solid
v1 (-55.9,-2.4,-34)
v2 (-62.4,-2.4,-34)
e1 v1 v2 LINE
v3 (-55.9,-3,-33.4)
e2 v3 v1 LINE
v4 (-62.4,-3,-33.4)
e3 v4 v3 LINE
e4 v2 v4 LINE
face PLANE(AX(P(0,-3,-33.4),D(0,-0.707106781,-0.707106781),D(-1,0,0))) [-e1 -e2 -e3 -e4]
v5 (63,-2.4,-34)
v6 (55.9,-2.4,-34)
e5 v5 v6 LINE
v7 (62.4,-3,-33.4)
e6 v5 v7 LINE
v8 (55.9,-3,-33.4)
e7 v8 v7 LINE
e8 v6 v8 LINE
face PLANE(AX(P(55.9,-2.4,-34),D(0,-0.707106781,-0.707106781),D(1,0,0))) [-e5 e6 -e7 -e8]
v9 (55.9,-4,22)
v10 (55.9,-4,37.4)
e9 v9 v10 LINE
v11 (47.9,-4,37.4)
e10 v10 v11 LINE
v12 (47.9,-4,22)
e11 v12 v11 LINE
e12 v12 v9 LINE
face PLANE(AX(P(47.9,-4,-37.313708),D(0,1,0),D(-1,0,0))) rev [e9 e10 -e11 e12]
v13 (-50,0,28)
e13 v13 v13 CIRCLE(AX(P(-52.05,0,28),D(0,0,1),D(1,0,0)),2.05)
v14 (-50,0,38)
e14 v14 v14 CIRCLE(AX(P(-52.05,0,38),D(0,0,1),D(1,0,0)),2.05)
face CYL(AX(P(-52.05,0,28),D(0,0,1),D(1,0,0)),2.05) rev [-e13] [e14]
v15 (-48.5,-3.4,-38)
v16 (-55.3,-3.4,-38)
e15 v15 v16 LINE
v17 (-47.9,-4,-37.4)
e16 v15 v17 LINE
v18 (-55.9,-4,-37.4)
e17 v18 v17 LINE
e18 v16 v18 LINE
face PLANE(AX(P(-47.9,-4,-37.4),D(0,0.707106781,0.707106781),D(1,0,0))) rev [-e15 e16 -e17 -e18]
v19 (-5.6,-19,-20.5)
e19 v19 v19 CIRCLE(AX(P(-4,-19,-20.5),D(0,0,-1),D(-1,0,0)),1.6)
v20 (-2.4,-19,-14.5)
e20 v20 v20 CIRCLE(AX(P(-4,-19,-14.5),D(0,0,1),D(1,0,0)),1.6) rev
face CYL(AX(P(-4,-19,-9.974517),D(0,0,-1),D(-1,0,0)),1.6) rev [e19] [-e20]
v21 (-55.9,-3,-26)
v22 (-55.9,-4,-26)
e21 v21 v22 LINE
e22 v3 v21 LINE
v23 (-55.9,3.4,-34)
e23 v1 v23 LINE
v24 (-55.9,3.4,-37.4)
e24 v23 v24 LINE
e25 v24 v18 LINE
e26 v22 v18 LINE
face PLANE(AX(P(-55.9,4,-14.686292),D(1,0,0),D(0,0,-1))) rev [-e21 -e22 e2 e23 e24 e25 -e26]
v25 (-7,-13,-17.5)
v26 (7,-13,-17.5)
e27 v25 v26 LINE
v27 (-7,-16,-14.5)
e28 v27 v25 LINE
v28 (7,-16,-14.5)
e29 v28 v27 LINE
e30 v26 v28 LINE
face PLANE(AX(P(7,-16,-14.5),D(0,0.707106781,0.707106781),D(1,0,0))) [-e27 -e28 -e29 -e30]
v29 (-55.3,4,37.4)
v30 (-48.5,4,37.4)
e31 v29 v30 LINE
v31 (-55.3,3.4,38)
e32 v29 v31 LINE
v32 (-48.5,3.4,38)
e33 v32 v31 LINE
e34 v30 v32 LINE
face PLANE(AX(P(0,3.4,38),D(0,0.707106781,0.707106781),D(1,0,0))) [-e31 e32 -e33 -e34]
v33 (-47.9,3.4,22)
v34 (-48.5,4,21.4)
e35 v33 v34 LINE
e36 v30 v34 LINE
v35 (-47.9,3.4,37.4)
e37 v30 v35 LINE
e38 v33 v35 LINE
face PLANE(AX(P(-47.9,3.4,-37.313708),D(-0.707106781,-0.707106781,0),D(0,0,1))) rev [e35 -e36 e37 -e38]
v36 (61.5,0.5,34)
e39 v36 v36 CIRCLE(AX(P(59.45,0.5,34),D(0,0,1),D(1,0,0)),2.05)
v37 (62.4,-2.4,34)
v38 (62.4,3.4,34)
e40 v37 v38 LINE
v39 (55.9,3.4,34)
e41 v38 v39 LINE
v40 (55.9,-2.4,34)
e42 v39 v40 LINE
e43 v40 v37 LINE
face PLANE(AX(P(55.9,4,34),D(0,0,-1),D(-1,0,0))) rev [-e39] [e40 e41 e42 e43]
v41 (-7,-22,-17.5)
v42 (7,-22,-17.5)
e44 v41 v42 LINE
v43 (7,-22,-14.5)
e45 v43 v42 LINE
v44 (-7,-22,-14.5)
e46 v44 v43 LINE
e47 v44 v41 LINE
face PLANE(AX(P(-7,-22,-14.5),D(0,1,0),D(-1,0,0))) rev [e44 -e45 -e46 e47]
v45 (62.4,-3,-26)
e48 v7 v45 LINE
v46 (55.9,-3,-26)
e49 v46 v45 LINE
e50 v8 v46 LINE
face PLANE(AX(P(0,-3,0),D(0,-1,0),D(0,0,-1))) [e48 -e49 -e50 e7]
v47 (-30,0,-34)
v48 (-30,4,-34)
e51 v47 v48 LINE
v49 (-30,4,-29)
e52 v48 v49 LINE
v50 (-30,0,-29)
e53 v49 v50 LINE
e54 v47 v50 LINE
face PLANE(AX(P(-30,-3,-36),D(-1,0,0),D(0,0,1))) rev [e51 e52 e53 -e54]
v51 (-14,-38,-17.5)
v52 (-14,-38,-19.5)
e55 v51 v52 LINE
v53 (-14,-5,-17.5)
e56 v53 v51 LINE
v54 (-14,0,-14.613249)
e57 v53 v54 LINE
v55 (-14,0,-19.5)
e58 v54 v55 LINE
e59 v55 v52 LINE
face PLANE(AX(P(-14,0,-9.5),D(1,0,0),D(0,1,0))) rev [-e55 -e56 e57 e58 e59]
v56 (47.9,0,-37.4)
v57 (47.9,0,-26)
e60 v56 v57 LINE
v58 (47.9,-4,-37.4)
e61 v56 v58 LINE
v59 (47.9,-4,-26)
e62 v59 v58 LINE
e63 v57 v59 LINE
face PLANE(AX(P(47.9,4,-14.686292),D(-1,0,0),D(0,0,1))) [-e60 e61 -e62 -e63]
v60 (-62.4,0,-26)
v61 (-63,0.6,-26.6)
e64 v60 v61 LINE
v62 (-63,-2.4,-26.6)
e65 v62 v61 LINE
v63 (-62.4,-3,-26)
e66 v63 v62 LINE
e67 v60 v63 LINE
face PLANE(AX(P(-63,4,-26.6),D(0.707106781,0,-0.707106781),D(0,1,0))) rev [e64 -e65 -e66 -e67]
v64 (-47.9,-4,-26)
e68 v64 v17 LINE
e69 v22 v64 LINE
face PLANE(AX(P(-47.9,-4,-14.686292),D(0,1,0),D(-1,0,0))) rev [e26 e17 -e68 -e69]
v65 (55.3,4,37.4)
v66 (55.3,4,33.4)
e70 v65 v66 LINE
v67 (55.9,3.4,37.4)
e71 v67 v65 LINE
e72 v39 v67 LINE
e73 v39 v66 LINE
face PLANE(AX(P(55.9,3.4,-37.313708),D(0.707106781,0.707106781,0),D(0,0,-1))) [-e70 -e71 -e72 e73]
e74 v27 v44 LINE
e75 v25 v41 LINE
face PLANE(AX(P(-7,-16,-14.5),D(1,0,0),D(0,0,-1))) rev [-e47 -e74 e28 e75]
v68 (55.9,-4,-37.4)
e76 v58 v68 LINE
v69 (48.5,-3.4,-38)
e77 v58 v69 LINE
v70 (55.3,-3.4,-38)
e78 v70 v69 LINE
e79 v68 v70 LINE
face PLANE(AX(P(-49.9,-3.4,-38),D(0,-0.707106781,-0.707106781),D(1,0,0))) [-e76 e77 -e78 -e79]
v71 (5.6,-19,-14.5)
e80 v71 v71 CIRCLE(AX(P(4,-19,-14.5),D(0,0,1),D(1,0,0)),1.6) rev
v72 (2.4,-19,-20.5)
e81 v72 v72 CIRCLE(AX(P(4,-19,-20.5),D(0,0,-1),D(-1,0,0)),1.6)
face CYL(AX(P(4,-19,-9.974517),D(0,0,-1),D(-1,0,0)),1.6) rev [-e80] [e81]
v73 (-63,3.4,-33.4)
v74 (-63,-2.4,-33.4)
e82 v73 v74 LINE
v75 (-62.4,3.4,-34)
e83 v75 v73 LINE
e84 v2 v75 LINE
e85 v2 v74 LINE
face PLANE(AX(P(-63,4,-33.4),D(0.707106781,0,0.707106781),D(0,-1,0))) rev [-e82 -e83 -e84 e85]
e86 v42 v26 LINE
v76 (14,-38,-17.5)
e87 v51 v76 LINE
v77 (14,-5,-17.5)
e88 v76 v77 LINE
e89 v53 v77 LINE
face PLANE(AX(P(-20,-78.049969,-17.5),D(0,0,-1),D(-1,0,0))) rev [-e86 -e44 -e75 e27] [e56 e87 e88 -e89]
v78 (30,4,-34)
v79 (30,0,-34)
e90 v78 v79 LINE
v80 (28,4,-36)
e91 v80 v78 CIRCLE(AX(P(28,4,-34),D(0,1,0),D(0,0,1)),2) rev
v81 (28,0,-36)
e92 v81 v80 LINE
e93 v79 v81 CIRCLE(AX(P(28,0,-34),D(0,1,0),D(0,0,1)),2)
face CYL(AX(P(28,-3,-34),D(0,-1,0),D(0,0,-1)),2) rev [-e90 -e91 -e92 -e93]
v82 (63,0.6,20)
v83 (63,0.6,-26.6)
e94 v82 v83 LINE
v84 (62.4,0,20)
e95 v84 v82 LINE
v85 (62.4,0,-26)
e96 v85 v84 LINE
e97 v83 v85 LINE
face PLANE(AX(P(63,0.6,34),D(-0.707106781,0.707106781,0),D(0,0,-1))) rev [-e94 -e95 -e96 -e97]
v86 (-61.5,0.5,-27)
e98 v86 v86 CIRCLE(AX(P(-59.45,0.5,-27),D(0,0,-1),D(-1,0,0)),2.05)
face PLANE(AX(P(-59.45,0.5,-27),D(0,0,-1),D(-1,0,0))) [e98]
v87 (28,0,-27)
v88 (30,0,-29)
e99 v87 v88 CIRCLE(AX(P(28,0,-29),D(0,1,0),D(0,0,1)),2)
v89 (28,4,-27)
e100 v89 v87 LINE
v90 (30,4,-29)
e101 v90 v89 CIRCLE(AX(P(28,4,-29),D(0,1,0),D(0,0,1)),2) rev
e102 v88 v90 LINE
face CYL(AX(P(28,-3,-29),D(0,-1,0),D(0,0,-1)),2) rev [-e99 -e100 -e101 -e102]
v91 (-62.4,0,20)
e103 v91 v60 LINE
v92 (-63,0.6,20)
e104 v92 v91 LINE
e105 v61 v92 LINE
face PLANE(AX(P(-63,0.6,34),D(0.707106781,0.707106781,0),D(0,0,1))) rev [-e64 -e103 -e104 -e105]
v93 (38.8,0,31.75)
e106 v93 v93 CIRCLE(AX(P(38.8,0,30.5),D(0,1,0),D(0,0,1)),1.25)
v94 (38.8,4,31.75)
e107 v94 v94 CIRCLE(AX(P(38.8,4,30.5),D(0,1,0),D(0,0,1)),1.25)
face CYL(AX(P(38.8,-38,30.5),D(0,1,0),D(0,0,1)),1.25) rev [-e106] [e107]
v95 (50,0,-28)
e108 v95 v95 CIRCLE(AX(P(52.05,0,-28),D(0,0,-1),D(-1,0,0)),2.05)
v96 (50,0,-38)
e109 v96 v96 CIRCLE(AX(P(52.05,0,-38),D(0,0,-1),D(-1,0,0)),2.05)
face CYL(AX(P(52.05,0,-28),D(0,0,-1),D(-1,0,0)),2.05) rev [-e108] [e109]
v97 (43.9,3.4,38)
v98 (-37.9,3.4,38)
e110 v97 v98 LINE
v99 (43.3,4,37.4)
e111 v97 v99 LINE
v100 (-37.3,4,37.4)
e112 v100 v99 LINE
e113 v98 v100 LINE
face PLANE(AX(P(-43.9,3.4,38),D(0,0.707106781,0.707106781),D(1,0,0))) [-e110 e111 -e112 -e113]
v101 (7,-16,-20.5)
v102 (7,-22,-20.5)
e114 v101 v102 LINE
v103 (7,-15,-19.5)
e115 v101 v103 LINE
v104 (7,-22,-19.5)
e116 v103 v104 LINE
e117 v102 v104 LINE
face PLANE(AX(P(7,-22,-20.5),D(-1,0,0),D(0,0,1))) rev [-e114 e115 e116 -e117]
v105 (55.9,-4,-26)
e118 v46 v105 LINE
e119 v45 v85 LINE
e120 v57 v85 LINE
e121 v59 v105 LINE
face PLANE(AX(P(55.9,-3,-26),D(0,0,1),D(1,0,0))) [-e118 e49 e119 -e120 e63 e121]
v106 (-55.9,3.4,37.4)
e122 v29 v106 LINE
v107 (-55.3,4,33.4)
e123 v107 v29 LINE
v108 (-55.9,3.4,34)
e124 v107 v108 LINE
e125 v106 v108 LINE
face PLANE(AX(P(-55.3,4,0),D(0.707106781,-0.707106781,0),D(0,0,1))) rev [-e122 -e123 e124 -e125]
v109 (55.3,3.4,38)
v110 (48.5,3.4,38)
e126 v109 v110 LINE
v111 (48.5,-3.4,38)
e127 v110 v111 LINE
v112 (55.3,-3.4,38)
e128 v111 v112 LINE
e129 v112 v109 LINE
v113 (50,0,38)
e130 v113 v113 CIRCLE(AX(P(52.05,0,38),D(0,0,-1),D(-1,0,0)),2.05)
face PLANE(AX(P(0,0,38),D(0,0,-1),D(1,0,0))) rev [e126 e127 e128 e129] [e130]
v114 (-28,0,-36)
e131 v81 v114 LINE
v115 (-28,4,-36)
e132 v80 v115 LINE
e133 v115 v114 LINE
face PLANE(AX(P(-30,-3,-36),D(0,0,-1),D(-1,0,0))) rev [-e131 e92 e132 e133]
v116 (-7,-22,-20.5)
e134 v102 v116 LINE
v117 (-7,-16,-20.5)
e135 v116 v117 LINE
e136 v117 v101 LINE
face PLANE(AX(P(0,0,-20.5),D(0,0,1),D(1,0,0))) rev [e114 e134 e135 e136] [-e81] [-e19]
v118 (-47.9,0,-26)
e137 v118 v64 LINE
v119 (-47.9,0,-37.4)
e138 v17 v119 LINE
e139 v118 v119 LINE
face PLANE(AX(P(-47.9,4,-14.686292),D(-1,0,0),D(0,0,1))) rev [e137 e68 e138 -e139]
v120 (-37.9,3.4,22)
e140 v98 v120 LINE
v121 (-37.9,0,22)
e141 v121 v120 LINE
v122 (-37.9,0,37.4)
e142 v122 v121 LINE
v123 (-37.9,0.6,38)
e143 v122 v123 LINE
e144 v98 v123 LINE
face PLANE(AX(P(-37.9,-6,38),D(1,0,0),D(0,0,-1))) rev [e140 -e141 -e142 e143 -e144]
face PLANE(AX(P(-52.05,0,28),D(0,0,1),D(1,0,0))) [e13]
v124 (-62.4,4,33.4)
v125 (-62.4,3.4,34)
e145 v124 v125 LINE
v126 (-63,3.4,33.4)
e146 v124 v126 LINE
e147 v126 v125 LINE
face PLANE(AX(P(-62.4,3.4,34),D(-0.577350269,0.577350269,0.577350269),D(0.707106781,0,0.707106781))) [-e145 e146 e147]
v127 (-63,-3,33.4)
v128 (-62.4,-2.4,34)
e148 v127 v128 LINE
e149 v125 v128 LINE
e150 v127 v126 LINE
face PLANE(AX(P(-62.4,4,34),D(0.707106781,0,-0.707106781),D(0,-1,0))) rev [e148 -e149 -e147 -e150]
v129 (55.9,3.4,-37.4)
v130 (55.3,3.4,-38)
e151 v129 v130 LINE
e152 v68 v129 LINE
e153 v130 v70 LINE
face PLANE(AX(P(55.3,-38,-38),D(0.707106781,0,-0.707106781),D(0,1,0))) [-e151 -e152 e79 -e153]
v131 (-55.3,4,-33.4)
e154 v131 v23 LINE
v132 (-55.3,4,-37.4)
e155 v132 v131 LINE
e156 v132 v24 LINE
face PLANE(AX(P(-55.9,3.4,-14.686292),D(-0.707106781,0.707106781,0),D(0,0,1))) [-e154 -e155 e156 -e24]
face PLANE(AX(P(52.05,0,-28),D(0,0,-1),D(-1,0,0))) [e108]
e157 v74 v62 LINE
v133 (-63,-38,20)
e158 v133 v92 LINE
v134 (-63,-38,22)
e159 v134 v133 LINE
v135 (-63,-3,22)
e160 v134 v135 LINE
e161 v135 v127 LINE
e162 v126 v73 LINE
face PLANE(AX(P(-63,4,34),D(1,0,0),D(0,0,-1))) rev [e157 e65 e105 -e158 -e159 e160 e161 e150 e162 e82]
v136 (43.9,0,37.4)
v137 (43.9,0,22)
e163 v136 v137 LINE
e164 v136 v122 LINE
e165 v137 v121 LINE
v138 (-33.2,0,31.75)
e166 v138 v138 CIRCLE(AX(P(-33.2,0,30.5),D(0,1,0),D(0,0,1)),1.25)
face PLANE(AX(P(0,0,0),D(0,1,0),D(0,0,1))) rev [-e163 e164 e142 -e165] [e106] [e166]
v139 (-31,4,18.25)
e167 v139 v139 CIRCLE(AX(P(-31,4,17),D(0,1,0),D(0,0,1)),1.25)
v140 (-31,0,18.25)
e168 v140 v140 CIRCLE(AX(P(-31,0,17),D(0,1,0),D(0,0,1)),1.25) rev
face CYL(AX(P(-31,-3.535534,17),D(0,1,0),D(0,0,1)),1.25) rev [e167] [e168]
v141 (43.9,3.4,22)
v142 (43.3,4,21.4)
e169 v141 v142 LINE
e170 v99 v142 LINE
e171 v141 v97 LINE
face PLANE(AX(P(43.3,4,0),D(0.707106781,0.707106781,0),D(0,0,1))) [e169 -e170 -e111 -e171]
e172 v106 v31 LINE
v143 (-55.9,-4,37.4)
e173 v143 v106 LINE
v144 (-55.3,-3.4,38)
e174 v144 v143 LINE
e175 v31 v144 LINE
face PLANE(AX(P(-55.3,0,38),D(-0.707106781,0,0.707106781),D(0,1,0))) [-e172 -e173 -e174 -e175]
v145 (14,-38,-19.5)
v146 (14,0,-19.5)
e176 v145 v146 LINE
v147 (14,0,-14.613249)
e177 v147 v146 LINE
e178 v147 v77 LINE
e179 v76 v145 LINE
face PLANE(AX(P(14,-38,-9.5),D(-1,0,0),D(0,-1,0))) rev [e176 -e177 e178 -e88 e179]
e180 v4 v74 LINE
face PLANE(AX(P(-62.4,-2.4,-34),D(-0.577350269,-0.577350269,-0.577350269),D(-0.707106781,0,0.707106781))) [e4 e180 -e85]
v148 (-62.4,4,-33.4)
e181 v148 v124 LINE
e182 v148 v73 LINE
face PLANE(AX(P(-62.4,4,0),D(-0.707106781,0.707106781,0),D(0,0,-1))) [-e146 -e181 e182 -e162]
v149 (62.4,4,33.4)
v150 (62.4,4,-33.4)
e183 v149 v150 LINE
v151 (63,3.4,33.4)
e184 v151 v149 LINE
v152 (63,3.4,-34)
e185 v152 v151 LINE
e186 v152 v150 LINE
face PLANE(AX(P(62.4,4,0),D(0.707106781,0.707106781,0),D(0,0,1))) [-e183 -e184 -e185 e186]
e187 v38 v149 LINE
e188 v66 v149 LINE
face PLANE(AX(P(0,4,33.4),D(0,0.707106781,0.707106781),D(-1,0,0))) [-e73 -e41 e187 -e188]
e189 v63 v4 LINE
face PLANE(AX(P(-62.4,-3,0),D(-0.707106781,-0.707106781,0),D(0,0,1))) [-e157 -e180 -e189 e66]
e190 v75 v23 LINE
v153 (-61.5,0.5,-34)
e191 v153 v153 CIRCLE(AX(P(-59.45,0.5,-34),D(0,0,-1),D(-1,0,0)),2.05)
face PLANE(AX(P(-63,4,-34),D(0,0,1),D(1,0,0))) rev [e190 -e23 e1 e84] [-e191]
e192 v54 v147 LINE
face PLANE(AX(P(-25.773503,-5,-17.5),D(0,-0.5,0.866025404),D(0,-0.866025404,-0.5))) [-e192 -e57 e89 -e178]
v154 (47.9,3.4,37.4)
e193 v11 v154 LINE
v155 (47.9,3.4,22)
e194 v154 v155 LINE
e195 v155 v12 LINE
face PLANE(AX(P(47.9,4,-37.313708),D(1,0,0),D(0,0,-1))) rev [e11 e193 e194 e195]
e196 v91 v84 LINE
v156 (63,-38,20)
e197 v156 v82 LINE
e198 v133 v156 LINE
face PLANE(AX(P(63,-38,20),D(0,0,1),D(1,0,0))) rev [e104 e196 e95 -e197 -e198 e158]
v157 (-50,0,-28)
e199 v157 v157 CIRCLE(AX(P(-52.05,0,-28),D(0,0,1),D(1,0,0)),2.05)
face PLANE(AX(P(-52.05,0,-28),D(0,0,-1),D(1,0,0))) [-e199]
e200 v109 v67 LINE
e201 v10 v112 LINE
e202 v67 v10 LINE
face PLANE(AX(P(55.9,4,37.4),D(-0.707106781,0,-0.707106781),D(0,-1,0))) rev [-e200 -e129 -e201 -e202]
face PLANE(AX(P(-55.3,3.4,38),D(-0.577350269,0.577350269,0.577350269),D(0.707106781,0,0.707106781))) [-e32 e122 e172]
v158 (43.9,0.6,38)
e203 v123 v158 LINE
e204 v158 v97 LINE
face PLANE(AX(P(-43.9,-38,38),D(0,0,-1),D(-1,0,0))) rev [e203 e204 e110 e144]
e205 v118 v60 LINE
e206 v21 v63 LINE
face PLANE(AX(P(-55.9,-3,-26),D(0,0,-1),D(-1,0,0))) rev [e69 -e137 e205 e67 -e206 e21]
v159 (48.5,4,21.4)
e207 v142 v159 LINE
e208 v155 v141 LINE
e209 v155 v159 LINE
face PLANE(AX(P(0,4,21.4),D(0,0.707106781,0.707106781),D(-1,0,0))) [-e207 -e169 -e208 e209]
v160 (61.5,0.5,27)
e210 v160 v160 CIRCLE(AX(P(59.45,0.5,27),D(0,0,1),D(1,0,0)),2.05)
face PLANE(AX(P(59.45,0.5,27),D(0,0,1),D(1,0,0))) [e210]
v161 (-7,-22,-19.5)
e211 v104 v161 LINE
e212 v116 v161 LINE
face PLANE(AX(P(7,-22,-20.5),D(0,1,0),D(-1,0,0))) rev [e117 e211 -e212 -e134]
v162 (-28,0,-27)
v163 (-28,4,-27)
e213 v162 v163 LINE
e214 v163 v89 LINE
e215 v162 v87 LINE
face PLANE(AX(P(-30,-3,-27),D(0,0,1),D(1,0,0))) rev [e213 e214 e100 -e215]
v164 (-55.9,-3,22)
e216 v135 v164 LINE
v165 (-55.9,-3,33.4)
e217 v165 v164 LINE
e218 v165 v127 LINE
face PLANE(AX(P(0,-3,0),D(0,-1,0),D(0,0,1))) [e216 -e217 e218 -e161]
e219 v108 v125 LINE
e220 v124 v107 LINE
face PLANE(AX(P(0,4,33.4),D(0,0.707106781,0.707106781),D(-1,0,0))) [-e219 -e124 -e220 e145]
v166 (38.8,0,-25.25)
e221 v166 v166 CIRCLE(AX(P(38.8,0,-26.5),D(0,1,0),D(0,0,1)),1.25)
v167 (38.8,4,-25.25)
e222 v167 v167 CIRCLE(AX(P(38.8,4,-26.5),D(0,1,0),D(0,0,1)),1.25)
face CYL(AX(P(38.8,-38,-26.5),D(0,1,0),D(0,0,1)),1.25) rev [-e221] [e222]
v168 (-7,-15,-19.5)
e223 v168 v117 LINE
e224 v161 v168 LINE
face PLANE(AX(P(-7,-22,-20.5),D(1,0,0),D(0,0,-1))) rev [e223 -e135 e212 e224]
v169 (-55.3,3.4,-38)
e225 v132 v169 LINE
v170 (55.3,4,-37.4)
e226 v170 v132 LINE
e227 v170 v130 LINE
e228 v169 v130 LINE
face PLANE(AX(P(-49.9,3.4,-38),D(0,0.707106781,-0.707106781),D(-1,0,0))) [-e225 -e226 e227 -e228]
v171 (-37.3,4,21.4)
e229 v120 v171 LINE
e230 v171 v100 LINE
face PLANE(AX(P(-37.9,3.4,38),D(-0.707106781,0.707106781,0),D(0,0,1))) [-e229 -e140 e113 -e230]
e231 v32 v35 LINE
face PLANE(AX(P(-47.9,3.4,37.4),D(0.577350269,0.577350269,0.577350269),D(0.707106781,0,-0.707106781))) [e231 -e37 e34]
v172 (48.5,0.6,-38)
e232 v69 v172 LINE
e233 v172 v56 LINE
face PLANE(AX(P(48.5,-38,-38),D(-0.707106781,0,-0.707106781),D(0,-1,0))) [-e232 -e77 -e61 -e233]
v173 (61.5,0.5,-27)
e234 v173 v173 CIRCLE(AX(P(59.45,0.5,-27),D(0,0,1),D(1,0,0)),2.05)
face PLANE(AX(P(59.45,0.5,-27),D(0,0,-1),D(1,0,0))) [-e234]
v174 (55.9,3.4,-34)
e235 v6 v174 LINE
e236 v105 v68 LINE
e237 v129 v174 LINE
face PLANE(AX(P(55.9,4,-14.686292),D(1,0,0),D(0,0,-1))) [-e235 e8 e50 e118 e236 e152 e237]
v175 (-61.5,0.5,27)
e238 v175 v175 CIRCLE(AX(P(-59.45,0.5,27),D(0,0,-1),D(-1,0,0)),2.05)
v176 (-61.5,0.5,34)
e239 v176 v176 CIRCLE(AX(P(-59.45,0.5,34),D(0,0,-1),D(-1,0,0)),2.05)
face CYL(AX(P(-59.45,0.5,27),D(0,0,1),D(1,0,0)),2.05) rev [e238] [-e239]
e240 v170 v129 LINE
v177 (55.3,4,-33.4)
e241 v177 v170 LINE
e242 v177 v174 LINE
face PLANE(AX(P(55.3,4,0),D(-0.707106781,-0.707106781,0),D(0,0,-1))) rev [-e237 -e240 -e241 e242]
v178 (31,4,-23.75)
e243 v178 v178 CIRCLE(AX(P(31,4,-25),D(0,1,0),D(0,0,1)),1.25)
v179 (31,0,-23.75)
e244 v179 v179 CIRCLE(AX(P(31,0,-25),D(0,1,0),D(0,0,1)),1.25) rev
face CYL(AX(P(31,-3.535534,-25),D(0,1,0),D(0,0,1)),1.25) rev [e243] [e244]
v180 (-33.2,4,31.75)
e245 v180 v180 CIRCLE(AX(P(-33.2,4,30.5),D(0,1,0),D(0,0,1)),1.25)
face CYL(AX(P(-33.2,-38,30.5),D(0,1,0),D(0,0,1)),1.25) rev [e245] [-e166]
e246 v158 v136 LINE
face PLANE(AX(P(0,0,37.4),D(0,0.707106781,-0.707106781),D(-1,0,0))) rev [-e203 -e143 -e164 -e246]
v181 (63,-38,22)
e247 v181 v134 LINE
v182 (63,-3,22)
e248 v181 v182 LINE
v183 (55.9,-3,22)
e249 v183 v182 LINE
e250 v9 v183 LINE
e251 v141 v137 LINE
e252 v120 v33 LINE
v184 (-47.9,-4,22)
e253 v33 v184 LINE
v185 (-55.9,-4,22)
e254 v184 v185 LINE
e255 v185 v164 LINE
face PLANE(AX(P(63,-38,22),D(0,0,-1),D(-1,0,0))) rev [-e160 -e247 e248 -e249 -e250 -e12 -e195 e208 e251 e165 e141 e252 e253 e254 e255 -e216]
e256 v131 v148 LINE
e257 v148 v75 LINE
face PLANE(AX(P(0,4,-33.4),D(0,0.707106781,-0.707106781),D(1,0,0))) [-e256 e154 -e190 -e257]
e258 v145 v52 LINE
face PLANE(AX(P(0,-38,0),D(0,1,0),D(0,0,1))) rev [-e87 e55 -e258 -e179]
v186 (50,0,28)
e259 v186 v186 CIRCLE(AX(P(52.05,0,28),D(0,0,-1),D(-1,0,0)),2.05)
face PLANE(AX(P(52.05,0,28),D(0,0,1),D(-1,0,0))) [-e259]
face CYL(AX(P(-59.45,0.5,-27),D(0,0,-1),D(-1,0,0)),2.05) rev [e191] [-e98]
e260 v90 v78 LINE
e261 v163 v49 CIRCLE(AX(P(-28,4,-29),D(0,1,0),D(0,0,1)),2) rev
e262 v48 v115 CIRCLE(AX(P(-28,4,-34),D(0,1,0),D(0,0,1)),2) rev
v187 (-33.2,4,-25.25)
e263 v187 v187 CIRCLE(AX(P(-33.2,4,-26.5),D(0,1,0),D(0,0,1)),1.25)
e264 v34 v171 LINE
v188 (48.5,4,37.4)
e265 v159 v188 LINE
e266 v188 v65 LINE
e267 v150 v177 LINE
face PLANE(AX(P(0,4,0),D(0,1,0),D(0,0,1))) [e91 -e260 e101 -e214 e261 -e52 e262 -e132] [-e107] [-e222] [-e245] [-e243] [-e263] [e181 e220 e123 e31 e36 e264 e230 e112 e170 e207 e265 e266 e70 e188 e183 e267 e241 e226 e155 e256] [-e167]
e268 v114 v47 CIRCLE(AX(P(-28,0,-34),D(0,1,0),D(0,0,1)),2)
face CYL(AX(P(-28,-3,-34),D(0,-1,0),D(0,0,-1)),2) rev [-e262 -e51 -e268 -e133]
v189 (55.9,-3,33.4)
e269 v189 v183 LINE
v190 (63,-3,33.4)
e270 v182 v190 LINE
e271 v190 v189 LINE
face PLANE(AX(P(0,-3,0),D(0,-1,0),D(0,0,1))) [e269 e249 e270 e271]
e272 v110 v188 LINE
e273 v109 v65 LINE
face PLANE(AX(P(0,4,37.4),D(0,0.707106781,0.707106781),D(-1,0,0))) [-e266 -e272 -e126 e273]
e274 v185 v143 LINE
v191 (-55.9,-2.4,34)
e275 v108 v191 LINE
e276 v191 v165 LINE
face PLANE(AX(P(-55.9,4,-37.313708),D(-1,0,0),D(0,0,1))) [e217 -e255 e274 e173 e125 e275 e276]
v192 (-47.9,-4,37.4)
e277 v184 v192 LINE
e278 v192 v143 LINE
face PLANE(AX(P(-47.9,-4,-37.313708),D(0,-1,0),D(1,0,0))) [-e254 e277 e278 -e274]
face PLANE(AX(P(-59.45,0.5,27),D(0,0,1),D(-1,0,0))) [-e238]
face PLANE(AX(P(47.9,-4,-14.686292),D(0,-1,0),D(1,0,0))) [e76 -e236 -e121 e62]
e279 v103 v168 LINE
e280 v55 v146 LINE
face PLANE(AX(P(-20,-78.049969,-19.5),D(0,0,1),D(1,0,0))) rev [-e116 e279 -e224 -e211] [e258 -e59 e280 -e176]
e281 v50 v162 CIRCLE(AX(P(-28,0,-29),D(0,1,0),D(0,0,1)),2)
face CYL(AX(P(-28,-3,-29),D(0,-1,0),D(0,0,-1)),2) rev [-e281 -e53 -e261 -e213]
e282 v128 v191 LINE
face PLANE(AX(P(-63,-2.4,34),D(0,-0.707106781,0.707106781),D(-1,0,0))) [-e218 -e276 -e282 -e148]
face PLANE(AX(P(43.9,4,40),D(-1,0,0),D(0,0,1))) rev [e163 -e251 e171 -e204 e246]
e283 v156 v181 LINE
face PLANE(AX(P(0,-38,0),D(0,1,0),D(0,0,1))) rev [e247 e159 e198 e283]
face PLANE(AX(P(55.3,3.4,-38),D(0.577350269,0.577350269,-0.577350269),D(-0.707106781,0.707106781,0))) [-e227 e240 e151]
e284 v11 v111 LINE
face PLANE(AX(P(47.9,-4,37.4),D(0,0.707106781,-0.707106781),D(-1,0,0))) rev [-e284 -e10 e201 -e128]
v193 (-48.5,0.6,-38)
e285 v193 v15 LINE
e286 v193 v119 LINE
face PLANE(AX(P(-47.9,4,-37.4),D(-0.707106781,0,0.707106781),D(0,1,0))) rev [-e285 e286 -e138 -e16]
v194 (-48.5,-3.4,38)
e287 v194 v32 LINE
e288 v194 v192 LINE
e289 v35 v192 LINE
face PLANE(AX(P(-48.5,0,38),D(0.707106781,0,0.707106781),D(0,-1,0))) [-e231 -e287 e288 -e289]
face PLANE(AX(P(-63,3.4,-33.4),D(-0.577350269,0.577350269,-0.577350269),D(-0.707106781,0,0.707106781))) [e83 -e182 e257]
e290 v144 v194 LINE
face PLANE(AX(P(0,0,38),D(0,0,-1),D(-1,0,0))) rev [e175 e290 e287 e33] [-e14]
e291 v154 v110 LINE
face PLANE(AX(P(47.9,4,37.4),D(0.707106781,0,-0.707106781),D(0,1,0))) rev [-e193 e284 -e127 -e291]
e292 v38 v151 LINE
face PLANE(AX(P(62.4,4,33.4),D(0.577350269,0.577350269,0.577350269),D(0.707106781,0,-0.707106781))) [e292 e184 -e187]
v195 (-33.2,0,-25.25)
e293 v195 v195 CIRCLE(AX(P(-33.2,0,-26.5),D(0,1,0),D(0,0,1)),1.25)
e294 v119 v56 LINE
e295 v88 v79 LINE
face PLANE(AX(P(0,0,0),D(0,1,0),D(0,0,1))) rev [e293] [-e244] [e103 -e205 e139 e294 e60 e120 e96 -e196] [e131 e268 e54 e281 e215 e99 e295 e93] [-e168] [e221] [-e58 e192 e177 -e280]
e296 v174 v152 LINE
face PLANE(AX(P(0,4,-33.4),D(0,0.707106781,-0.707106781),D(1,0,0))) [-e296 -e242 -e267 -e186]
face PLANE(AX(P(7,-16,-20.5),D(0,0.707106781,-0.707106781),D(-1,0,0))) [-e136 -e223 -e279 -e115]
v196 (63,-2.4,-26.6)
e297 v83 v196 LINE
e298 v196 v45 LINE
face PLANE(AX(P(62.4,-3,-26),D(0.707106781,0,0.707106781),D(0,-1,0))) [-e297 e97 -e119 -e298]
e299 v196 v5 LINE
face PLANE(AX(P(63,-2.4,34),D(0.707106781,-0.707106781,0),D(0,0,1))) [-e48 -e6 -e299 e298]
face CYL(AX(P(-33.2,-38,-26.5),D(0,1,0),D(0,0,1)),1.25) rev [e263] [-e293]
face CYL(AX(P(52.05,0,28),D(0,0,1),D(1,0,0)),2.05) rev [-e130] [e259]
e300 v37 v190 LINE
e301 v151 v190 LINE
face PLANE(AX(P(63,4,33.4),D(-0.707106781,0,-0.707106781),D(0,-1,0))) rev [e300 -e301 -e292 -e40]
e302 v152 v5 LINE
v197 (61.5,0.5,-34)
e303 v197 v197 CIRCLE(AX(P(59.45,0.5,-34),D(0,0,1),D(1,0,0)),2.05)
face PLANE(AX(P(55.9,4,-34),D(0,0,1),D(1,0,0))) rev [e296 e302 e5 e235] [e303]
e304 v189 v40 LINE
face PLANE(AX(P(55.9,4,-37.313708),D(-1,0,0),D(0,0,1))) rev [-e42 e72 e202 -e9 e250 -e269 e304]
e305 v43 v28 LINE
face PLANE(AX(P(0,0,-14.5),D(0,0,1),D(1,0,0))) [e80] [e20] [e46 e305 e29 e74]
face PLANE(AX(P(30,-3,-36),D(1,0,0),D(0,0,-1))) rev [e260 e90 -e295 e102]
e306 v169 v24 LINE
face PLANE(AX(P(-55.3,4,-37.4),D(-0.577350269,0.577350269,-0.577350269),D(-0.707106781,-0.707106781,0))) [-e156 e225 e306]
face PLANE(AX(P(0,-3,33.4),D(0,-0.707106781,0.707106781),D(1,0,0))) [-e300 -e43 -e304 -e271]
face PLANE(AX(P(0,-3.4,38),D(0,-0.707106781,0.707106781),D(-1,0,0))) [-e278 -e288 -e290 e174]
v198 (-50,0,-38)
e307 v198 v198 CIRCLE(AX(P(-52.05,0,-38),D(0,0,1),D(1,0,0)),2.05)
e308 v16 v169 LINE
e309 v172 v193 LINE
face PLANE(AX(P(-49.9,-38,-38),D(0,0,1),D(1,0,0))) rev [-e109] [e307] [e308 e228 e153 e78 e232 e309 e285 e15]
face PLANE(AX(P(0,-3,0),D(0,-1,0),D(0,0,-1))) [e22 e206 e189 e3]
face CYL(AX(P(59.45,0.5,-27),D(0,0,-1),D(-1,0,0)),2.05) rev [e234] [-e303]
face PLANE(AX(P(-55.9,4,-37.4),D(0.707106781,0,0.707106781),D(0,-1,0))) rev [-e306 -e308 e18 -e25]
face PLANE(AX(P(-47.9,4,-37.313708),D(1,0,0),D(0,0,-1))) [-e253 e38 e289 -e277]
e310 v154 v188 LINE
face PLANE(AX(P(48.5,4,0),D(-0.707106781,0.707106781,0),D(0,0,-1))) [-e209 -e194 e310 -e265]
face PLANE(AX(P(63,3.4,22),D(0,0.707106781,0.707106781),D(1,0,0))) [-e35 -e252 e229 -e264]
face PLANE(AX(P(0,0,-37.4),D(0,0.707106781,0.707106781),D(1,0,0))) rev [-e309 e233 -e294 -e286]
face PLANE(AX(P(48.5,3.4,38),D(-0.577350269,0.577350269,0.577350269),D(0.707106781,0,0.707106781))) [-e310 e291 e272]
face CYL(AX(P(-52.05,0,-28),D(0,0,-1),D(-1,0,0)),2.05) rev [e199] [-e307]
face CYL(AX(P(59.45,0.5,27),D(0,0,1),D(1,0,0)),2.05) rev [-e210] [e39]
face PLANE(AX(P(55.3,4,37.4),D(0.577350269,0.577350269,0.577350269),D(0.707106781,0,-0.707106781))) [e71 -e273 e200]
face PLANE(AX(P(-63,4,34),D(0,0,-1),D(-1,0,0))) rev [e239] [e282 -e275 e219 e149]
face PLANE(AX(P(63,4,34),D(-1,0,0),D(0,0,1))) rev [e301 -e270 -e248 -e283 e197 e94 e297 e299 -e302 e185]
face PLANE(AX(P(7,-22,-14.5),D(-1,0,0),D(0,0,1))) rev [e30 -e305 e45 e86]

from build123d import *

# Parameters (mm, degrees)
BOSS_EXTRUDE1_DEPTH             = 4
SKETCH3_W                       = 7.1
SKETCH3_H                       = 8
BOSS_EXTRUDE3_DEPTH             = 3
SKETCH4_R                       = 2.05
CUT_EXTRUDE1_DEPTH              = 7
MIRROR2_COPY_1_SKETCH_W         = 7.1
MIRROR2_COPY_1_SKETCH_H         = 8
MIRROR2_COPY_1_DEPTH            = 3
MIRROR2_COPY_2_SKETCH_R         = 2.05
MIRROR2_COPY_2_DEPTH            = 7
SKETCH5_W                       = 60
SKETCH5_H                       = 9
CUT_EXTRUDE2_DEPTH              = 76.4917214
FILLET1_R                       = 2
SKETCH7_W                       = 111.8
SKETCH7_H                       = 1
CUT_EXTRUDE3_DEPTH              = 76.4917214
SKETCH8_W                       = 126
SKETCH8_H                       = 2
BOSS_EXTRUDE4_DEPTH             = 38
SKETCH9_W                       = 12
SKETCH9_H                       = 18
CUT_EXTRUDE4_DEPTH              = 10
SKETCH10_W                      = 7.1
SKETCH10_H                      = 4
BOSS_EXTRUDE5_DEPTH             = 3
SKETCH12_W                      = 1.5
SKETCH12_H                      = 4
BOSS_EXTRUDE6_DEPTH             = 2
SKETCH13_W                      = 40
SKETCH13_H                      = 2
BOSS_EXTRUDE7_DEPTH             = 38
SKETCH14_W                      = 1.5
SKETCH14_H                      = 4
BOSS_EXTRUDE8_DEPTH             = 1
BOSS_EXTRUDE9_REACH             = 85.744
BOSS_EXTRUDE9_DIRECTION_2_REACH = 85.744
SKETCH16_W                      = 20
SKETCH16_H                      = 14
SKETCH16_W_2                    = 14.5
SKETCH16_H_2                    = 9
BOSS_EXTRUDE10_DEPTH            = 4
SKETCH17_W                      = 12
SKETCH17_H                      = 18
CUT_EXTRUDE5_DEPTH              = 84.743656476
SKETCH18_W                      = 6
SKETCH18_H                      = 6
CUT_EXTRUDE6_DEPTH              = 86.632937588
SKETCH22_R                      = 1.25
CUT_EXTRUDE7_DEPTH              = 4
SKETCH25_W                      = 6
SKETCH25_H                      = 38
CUT_EXTRUDE11_DEPTH             = 10
CUT_EXTRUDE12_DEPTH             = 85.498520697
CUT_EXTRUDE12_DEPTH_BACK        = 85.498520697
SKETCH26_W                      = 7.701552738
SKETCH26_H                      = 30.562488548
SKETCH26_W_2                    = 6.53419365
SKETCH26_H_2                    = 28.524331859
SKETCH27_R                      = 1.25
CUT_EXTRUDE13_DEPTH             = 86.632937588
SKETCH28_W                      = 99.8
SKETCH28_H                      = 0.6
SKETCH28_W_2                    = 87.8
CUT_EXTRUDE14_DEPTH             = 86.632937588
SKETCH29_W                      = 87.8
SKETCH29_H                      = 1.4
CUT_EXTRUDE15_DEPTH             = 86.354320336
SKETCH30_W                      = 99.8
SKETCH30_H                      = 1.4
CUT_EXTRUDE16_DEPTH             = 86.354320336
SKETCH31_W                      = 2
SKETCH31_H                      = 4
CUT_EXTRUDE17_DEPTH             = 85.717176535
BOSS_EXTRUDE11_START            = -12
SKETCH32_W                      = 8
SKETCH32_H                      = 8
BOSS_EXTRUDE11_DEPTH            = 12
SKETCH33_R                      = 2.05
CUT_EXTRUDE18_DEPTH             = 10
MIRROR5_START                   = -26
MIRROR5_OUTLINE_W               = 8
MIRROR5_OUTLINE_H               = 8
MIRROR5_OUTLINE_R               = 2.05
MIRROR5_DEPTH                   = 64
MIRROR5_2_OUTLINE_R             = 2.05
MIRROR5_2_DEPTH                 = 54
SKETCH34_W                      = 6
SKETCH34_H                      = 16
CUT_EXTRUDE19_DEPTH             = 10
SKETCH35_W                      = 8
SKETCH35_H                      = 46
CUT_EXTRUDE20_DEPTH             = 4
SKETCH36_W                      = 14
SKETCH36_H                      = 6
BOSS_EXTRUDE12_DEPTH            = 1
SKETCH38_W                      = 14
SKETCH38_H                      = 6
BOSS_EXTRUDE13_DEPTH            = 3
CHAMFER1_SIZE                   = 1
SKETCH37_R                      = 1.6
CUT_EXTRUDE21_DEPTH             = 6
CHAMFER2_SIZE                   = 3
SKETCH39_W                      = 20
SKETCH39_H                      = 14
CUT_EXTRUDE22_DEPTH             = 16
CHAMFER3_SIZE                   = 0.6


# Read off the part's stored shape, not the designer's step: Mirror5
with BuildPart() as part:
    # Sketch1 → Boss-Extrude1 (new body)
    with BuildSketch(Plane(origin=(0, 0, 0), x_dir=(1, 0, 0), z_dir=(0, 1, 0))):
        Polygon((-63, -34), (-55.9, -34), (-55.9, -41), (55.9, -41), (55.9, -34), (63, -34), (63, 34), (55.9, 34), (55.9, 41), (-55.9, 41), (-55.9, 34), (-63, 34), align=None)
    extrude(amount=BOSS_EXTRUDE1_DEPTH)

    # Sketch3 → Boss-Extrude3 (add)
    with BuildSketch(Plane.XZ):
        with Locations((-59.45, -30)):
            Rectangle(SKETCH3_W, SKETCH3_H)
    boss_extrude3 = extrude(amount=BOSS_EXTRUDE3_DEPTH)

    # Sketch4 → Cut-Extrude1 (cut)
    with BuildSketch(Plane(origin=(0, 0, -34), x_dir=(-1, 0, 0), z_dir=(0, 0, -1))):
        with Locations((59.45, 0.5)):
            Circle(SKETCH4_R)
    cut_extrude1 = extrude(amount=-CUT_EXTRUDE1_DEPTH, mode=Mode.SUBTRACT)

    # Mirror1: Boss-Extrude3, Cut-Extrude1 across plane
    add(boss_extrude3.mirror(Plane(origin=(0, 0, 0), x_dir=(0, 0, 1), z_dir=(1, 0, 0))))
    add(cut_extrude1.mirror(Plane(origin=(0, 0, 0), x_dir=(0, 0, 1), z_dir=(1, 0, 0))), mode=Mode.SUBTRACT)

    # Mirror2: Boss-Extrude3, Cut-Extrude1 across plane
    add(boss_extrude3.mirror(Plane.XY))
    add(cut_extrude1.mirror(Plane.XY), mode=Mode.SUBTRACT)

    # Mirror2 copy 1 sketch → Mirror2 copy 1 (add)
    with BuildSketch(Plane(origin=(0, 0, 0), x_dir=(-1, 0, 0), z_dir=(0, -1, 0))):
        with Locations((-59.45, -30)):
            Rectangle(MIRROR2_COPY_1_SKETCH_W, MIRROR2_COPY_1_SKETCH_H)
    extrude(amount=MIRROR2_COPY_1_DEPTH)

    # Mirror2 copy 2 sketch → Mirror2 copy 2 (cut)
    with BuildSketch(Plane.XY.offset(34)):
        with Locations((59.45, 0.5)):
            Circle(MIRROR2_COPY_2_SKETCH_R)
    extrude(amount=-MIRROR2_COPY_2_DEPTH, mode=Mode.SUBTRACT)

    # Sketch5 → Cut-Extrude2 (cut, through all)
    with BuildSketch(Plane(origin=(0, 4, 0), x_dir=(1, 0, 0), z_dir=(0, 1, 0))):
        with Locations((0, 31.5)):
            Rectangle(SKETCH5_W, SKETCH5_H)
    extrude(amount=-CUT_EXTRUDE2_DEPTH, mode=Mode.SUBTRACT)

    # Fillet1
    fillet1_edges = [part.edges().sort_by_distance(p)[0] for p in [
        (-30, 2, -27),
        (-30, 2, -36),
        (30, 2, -36),
        (30, 2, -27),
    ]]
    fillet(fillet1_edges, radius=FILLET1_R)

    # Sketch7 → Cut-Extrude3 (cut, through all)
    with BuildSketch(Plane(origin=(0, 4, 0), x_dir=(1, 0, 0), z_dir=(0, 1, 0))):
        with Locations((0, 40.5)):
            Rectangle(SKETCH7_W, SKETCH7_H)
        with Locations((0, -40.5)):
            Rectangle(SKETCH7_W, SKETCH7_H)
    extrude(amount=-CUT_EXTRUDE3_DEPTH, mode=Mode.SUBTRACT)

    # Sketch8 → Boss-Extrude4 (add)
    with BuildSketch(Plane.XZ):
        with Locations((0, 21)):
            Rectangle(SKETCH8_W, SKETCH8_H)
    extrude(amount=BOSS_EXTRUDE4_DEPTH)

    # Sketch9 → Cut-Extrude4 (cut)
    with BuildSketch(Plane(origin=(0, 4, 0), x_dir=(1, 0, 0), z_dir=(0, 1, 0))):
        with Locations((-49.9, -31)):
            Rectangle(SKETCH9_W, SKETCH9_H)
    extrude(amount=-CUT_EXTRUDE4_DEPTH, mode=Mode.SUBTRACT)

    # Sketch10 → Boss-Extrude5 (add)
    with BuildSketch(Plane.XZ.offset(3)):
        with Locations((-59.45, 24)):
            Rectangle(SKETCH10_W, SKETCH10_H)
        with Locations((59.45, 24)):
            Rectangle(SKETCH10_W, SKETCH10_H)
    extrude(amount=-BOSS_EXTRUDE5_DEPTH)

    # Sketch12 → Boss-Extrude6 (add)
    # profile 1 of 2: a face of its own
    with BuildSketch(Plane.ZY.offset(56)):
        Polygon((22, -5.8), (22, -16.2), (24.7, -13.5), (24.7, -8.5), align=None)
        with Locations((23.35, -11)):
            Rectangle(SKETCH12_W, SKETCH12_H, mode=Mode.SUBTRACT)
    # profile 2 of 2: a face of its own
    with BuildSketch(Plane.ZY.offset(56)):
        Polygon((22, -20.8), (22, -31.2), (24.7, -28.5), (24.7, -23.5), align=None)
        with Locations((23.35, -26)):
            Rectangle(SKETCH12_W, SKETCH12_H, mode=Mode.SUBTRACT)
    boss_extrude6 = extrude(amount=-BOSS_EXTRUDE6_DEPTH)

    # Mirror3: Boss-Extrude6 across plane
    add(boss_extrude6.mirror(Plane(origin=(-49.9, 0, 0), x_dir=(0, 0, 1), z_dir=(1, 0, 0))))

    # Sketch13 → Boss-Extrude7 (add)
    with BuildSketch(Plane.XZ):
        with Locations((0, -18.5)):
            Rectangle(SKETCH13_W, SKETCH13_H)
    extrude(amount=BOSS_EXTRUDE7_DEPTH)

    # Sketch14 → Boss-Extrude8 (add, symmetric)
    # profile 1 of 2: a face of its own
    with BuildSketch(Plane(origin=(0, 0, 0), x_dir=(0, 0, -1), z_dir=(1, 0, 0))):
        Polygon((22.2, -8.5), (19.5, -5.8), (19.5, -16.2), (22.2, -13.5), align=None)
        with Locations((20.85, -11)):
            Rectangle(SKETCH14_W, SKETCH14_H, mode=Mode.SUBTRACT)
    # profile 2 of 2: a face of its own
    with BuildSketch(Plane(origin=(0, 0, 0), x_dir=(0, 0, -1), z_dir=(1, 0, 0))):
        Polygon((22.2, -28.5), (22.2, -23.5), (19.5, -20.8), (19.5, -31.2), align=None)
        with Locations((20.85, -26)):
            Rectangle(SKETCH14_W, SKETCH14_H, mode=Mode.SUBTRACT)
    extrude(amount=BOSS_EXTRUDE8_DEPTH, both=True)

    # Boss-Extrude9: up to this face of the body (flat: up to its plane)
    boss_extrude9_end = Plane(part.part.faces().sort_by_distance((-20, -19, -18.5))[0])
    # Sketch15 → Boss-Extrude9 (add, up to the picked face)
    with BuildSketch(Plane(origin=(0, 0, 0), x_dir=(0, 0, -1), z_dir=(1, 0, 0)), mode=Mode.PRIVATE) as boss_extrude9_sk1:
        Polygon((17.5, 0), (17.5, -5), (14.613248654, 0), align=None)
    boss_extrude9_tool1 = split(extrude(boss_extrude9_sk1.sketch, amount=-BOSS_EXTRUDE9_REACH, mode=Mode.PRIVATE), bisect_by=boss_extrude9_end, keep=Keep.BOTH, mode=Mode.PRIVATE)
    add(boss_extrude9_tool1.solids().sort_by(Axis((0, -1.666667, -16.53775), (-1, 0, 0)))[0])

    # Boss-Extrude9 direction 2: up to this face of the body (flat: up to its plane)
    boss_extrude9_direction_2_end = Plane(part.part.faces().sort_by_distance((20, -19, -18.5))[0])
    # Sketch15 → Boss-Extrude9 direction 2 (add, up to the picked face)
    with BuildSketch(Plane(origin=(0, 0, 0), x_dir=(0, 0, -1), z_dir=(1, 0, 0)), mode=Mode.PRIVATE) as boss_extrude9_direction_2_sk1:
        Polygon((17.5, 0), (17.5, -5), (14.613248654, 0), align=None)
    boss_extrude9_direction_2_tool1 = split(extrude(boss_extrude9_direction_2_sk1.sketch, amount=BOSS_EXTRUDE9_DIRECTION_2_REACH, mode=Mode.PRIVATE), bisect_by=boss_extrude9_direction_2_end, keep=Keep.BOTH, mode=Mode.PRIVATE)
    add(boss_extrude9_direction_2_tool1.solids().sort_by(Axis((0, -1.666667, -16.53775), (1, 0, 0)))[0])

    # Sketch16 → Boss-Extrude10 (add)
    with BuildSketch(Plane.XY.offset(40)):
        with Locations((30, -7)):
            Rectangle(SKETCH16_W, SKETCH16_H)
        with Locations((30, -7)):
            Rectangle(SKETCH16_W_2, SKETCH16_H_2, mode=Mode.SUBTRACT)
    extrude(amount=-BOSS_EXTRUDE10_DEPTH)

    # Sketch17 → Cut-Extrude5 (cut, through all)
    with BuildSketch(Plane.XZ):
        with Locations((49.9, 31)):
            Rectangle(SKETCH17_W, SKETCH17_H)
    extrude(amount=-CUT_EXTRUDE5_DEPTH, mode=Mode.SUBTRACT)

    # Sketch18 → Cut-Extrude6 (cut, through all)
    with BuildSketch(Plane(origin=(0, 4, 0), x_dir=(1, 0, 0), z_dir=(0, 1, 0))):
        with Locations((52.9, 37)):
            Rectangle(SKETCH18_W, SKETCH18_H)
        with Locations((-52.9, 37)):
            Rectangle(SKETCH18_W, SKETCH18_H)
    extrude(amount=-CUT_EXTRUDE6_DEPTH, mode=Mode.SUBTRACT)

    # Sketch22 → Cut-Extrude7 (cut)
    with BuildSketch(Plane(origin=(0, 4, 0), x_dir=(1, 0, 0), z_dir=(0, 1, 0))):
        with Locations(Location((31, 25, 0), (0, 0, 270))):
            Circle(SKETCH22_R)
        with Locations(Location((-31, -17, 0), (0, 0, 270))):
            Circle(SKETCH22_R)
    extrude(amount=-CUT_EXTRUDE7_DEPTH, mode=Mode.SUBTRACT)

    # Sketch25 → Cut-Extrude11 (cut)
    with BuildSketch(Plane(origin=(0, 0, -19.5), x_dir=(-1, 0, 0), z_dir=(0, 0, -1))):
        with Locations((-17, -19)):
            Rectangle(SKETCH25_W, SKETCH25_H)
        with Locations((17, -19)):
            Rectangle(SKETCH25_W, SKETCH25_H)
    extrude(amount=-CUT_EXTRUDE11_DEPTH, mode=Mode.SUBTRACT)

    # Sketch26 → Cut-Extrude12 (cut, two sides: drawn at the far end of the back side and taken through both)
    with BuildSketch(Plane.ZY.offset(1).offset(-CUT_EXTRUDE12_DEPTH_BACK)):
        with Locations((-23.350776369, -21.081244274)):
            Rectangle(SKETCH26_W, SKETCH26_H)
        with Locations((25.267096825, -20.06216593)):
            Rectangle(SKETCH26_W_2, SKETCH26_H_2)
    extrude(amount=CUT_EXTRUDE12_DEPTH + CUT_EXTRUDE12_DEPTH_BACK, mode=Mode.SUBTRACT)

    # Sketch27 → Cut-Extrude13 (cut, through all)
    with BuildSketch(Plane(origin=(0, 4, 0), x_dir=(1, 0, 0), z_dir=(0, 1, 0))):
        with Locations(Location((-33.2, 26.5, 0), (0, 0, 270))):
            Circle(SKETCH27_R)
        with Locations(Location((-33.2, -30.5, 0), (0, 0, 270))):
            Circle(SKETCH27_R)
        with Locations(Location((38.8, -30.5, 0), (0, 0, 270))):
            Circle(SKETCH27_R)
        with Locations(Location((38.8, 26.5, 0), (0, 0, 270))):
            Circle(SKETCH27_R)
    extrude(amount=-CUT_EXTRUDE13_DEPTH, mode=Mode.SUBTRACT)

    # Sketch28 → Cut-Extrude14 (cut, through all)
    with BuildSketch(Plane(origin=(0, 4, 0), x_dir=(1, 0, 0), z_dir=(0, 1, 0))):
        with Locations((0, 39.7)):
            Rectangle(SKETCH28_W, SKETCH28_H)
        with Locations((0, -39.7)):
            Rectangle(SKETCH28_W_2, SKETCH28_H)
    extrude(amount=-CUT_EXTRUDE14_DEPTH, mode=Mode.SUBTRACT)

    # Sketch29 → Cut-Extrude15 (cut, through all)
    with BuildSketch(Plane(origin=(0, 4, 0), x_dir=(1, 0, 0), z_dir=(0, 1, 0))):
        with Locations((0, -38.7)):
            Rectangle(SKETCH29_W, SKETCH29_H)
    extrude(amount=-CUT_EXTRUDE15_DEPTH, mode=Mode.SUBTRACT)

    # Sketch30 → Cut-Extrude16 (cut, through all)
    with BuildSketch(Plane(origin=(0, 4, 0), x_dir=(1, 0, 0), z_dir=(0, 1, 0))):
        with Locations((0, 38.7)):
            Rectangle(SKETCH30_W, SKETCH30_H)
    extrude(amount=-CUT_EXTRUDE16_DEPTH, mode=Mode.SUBTRACT)

    # Sketch31 → Cut-Extrude17 (cut, through all)
    with BuildSketch(Plane(origin=(0, 4, 0), x_dir=(1, 0, 0), z_dir=(0, 1, 0))):
        with Locations((-48.9, 36)):
            Rectangle(SKETCH31_W, SKETCH31_H)
        with Locations((48.9, 36)):
            Rectangle(SKETCH31_W, SKETCH31_H)
    extrude(amount=-CUT_EXTRUDE17_DEPTH, mode=Mode.SUBTRACT)

    # Sketch32 → Boss-Extrude11 (add)
    with BuildSketch(Plane(origin=(0, 0, -38), x_dir=(-1, 0, 0), z_dir=(0, 0, -1)).offset(BOSS_EXTRUDE11_START)):
        with Locations((-51.9, 0)):
            Rectangle(SKETCH32_W, SKETCH32_H)
    boss_extrude11 = extrude(amount=BOSS_EXTRUDE11_DEPTH)

    # Sketch33 → Cut-Extrude18 (cut)
    with BuildSketch(Plane(origin=(0, 0, -38), x_dir=(-1, 0, 0), z_dir=(0, 0, -1))):
        with Locations((-52.05, 0)):
            Circle(SKETCH33_R)
    cut_extrude18 = extrude(amount=-CUT_EXTRUDE18_DEPTH, mode=Mode.SUBTRACT)

    # Mirror4: Boss-Extrude11, Cut-Extrude18 across plane
    add(boss_extrude11.mirror(Plane(origin=(0, 0, 0), x_dir=(0, 0, 1), z_dir=(1, 0, 0))))
    add(cut_extrude18.mirror(Plane(origin=(0, 0, 0), x_dir=(0, 0, 1), z_dir=(1, 0, 0))), mode=Mode.SUBTRACT)

    # Mirror5 outline → Mirror5 (add)
    # profile 1 of 2: a face of its own
    with BuildSketch(Plane.XY.offset(MIRROR5_START)):
        with Locations((51.9, 0)):
            Rectangle(MIRROR5_OUTLINE_W, MIRROR5_OUTLINE_H)
        with Locations((52.05, 0)):
            Circle(MIRROR5_OUTLINE_R, mode=Mode.SUBTRACT)
    # profile 2 of 2: a face of its own
    with BuildSketch(Plane.XY.offset(MIRROR5_START)):
        with Locations((-51.9, 0)):
            Rectangle(MIRROR5_OUTLINE_W, MIRROR5_OUTLINE_H)
        with Locations((-52.05, 0)):
            Circle(MIRROR5_OUTLINE_R, mode=Mode.SUBTRACT)
    extrude(amount=MIRROR5_DEPTH)

    # Mirror5 2 outline → Mirror5 2 (add)
    with BuildSketch(Plane.XY.offset(MIRROR5_START)):
        with Locations((52.05, 0)):
            Circle(MIRROR5_2_OUTLINE_R)
        with Locations((-52.05, 0)):
            Circle(MIRROR5_2_OUTLINE_R)
    extrude(amount=MIRROR5_2_DEPTH)

    # Sketch34 → Cut-Extrude19 (cut)
    with BuildSketch(Plane(origin=(0, 4, 0), x_dir=(1, 0, 0), z_dir=(0, 1, 0))):
        with Locations((-40.9, -30)):
            Rectangle(SKETCH34_W, SKETCH34_H)
    extrude(amount=-CUT_EXTRUDE19_DEPTH, mode=Mode.SUBTRACT)

    # Sketch35 → Cut-Extrude20 (cut)
    with BuildSketch(Plane.XZ.offset(4)):
        with Locations((-51.9, -3)):
            Rectangle(SKETCH35_W, SKETCH35_H)
        with Locations((51.9, -3)):
            Rectangle(SKETCH35_W, SKETCH35_H)
    extrude(amount=-CUT_EXTRUDE20_DEPTH, mode=Mode.SUBTRACT)

    # Sketch36 → Boss-Extrude12 (add)
    with BuildSketch(Plane(origin=(0, 0, -19.5), x_dir=(-1, 0, 0), z_dir=(0, 0, -1))):
        with Locations((0, -19)):
            Rectangle(SKETCH36_W, SKETCH36_H)
    extrude(amount=BOSS_EXTRUDE12_DEPTH)

    # Sketch38 → Boss-Extrude13 (add)
    with BuildSketch(Plane.XY.offset(-17.5)):
        with Locations((0, -19)):
            Rectangle(SKETCH38_W, SKETCH38_H)
    extrude(amount=BOSS_EXTRUDE13_DEPTH)

    # Chamfer1
    chamfer1_edges = [part.edges().sort_by_distance(p)[0] for p in [
        (0, -16, -19.5),
    ]]
    chamfer(chamfer1_edges, length=CHAMFER1_SIZE - 0.0001)  # a hair under: the kernel refuses the full size

    # Sketch37 → Cut-Extrude21 (cut)
    with BuildSketch(Plane(origin=(0, 0, -20.5), x_dir=(-1, 0, 0), z_dir=(0, 0, -1))):
        with Locations((-4, -19)):
            Circle(SKETCH37_R)
        with Locations((4, -19)):
            Circle(SKETCH37_R)
    extrude(amount=-CUT_EXTRUDE21_DEPTH, mode=Mode.SUBTRACT)

    # Chamfer2
    chamfer2_edges = [part.edges().sort_by_distance(p)[0] for p in [
        (0, -16, -17.5),
    ]]
    chamfer(chamfer2_edges, length=CHAMFER2_SIZE - 0.0001)  # a hair under: the kernel refuses the full size

    # Sketch39 → Cut-Extrude22 (cut)
    with BuildSketch(Plane.XY.offset(38)):
        with Locations((30, -7)):
            Rectangle(SKETCH39_W, SKETCH39_H)
    extrude(amount=-CUT_EXTRUDE22_DEPTH, mode=Mode.SUBTRACT)

    # Chamfer3
    chamfer3_edges = [part.edges().sort_by_distance(p)[0] for p in [
        (-63, 0, -3),
        (63, 0, -3),
        (0, 0, -38),
        (59.45, 4, -34),
        (55.9, 4, -36),
        (0, 4, -38),
        (-55.9, 4, -36),
        (-59.45, 4, -34),
        (-63, 4, 0),
        (-59.45, 4, 34),
        (-55.9, 4, 36),
        (-51.9, 4, 38),
        (-47.9, 4, 30),
        (-42.9, 4, 22),
        (-37.9, 4, 30),
        (3, 4, 38),
        (43.9, 4, 30),
        (45.9, 4, 22),
        (47.9, 4, 30),
        (51.9, 4, 38),
        (55.9, 4, 36),
        (59.45, 4, 34),
        (63, 4, 0),
        (3, 0, 38),
        (63, 0.5, 34),
        (59.45, -3, 34),
        (55.9, 0, 38),
        (51.9, -4, 38),
        (47.9, 0, 38),
        (-51.9, -4, 38),
        (-59.45, -3, 34),
        (-47.9, 0, 38),
        (-55.9, 0, 38),
        (-63, 0.5, 34),
        (-59.45, -3, -34),
        (-63, 0.5, -34),
        (-63, -3, -30),
        (-55.9, 0, -38),
        (-51.9, -4, -38),
        (55.9, 0, -38),
        (51.9, -4, -38),
        (59.45, -3, -34),
        (63, -3, -30),
        (47.9, -2, -38),
        (-47.9, -2, -38),
        (63, -1.5, -26),
        (-63, -1.5, -26),
    ]]
    chamfer(chamfer3_edges, length=CHAMFER3_SIZE)


solid = part.part
